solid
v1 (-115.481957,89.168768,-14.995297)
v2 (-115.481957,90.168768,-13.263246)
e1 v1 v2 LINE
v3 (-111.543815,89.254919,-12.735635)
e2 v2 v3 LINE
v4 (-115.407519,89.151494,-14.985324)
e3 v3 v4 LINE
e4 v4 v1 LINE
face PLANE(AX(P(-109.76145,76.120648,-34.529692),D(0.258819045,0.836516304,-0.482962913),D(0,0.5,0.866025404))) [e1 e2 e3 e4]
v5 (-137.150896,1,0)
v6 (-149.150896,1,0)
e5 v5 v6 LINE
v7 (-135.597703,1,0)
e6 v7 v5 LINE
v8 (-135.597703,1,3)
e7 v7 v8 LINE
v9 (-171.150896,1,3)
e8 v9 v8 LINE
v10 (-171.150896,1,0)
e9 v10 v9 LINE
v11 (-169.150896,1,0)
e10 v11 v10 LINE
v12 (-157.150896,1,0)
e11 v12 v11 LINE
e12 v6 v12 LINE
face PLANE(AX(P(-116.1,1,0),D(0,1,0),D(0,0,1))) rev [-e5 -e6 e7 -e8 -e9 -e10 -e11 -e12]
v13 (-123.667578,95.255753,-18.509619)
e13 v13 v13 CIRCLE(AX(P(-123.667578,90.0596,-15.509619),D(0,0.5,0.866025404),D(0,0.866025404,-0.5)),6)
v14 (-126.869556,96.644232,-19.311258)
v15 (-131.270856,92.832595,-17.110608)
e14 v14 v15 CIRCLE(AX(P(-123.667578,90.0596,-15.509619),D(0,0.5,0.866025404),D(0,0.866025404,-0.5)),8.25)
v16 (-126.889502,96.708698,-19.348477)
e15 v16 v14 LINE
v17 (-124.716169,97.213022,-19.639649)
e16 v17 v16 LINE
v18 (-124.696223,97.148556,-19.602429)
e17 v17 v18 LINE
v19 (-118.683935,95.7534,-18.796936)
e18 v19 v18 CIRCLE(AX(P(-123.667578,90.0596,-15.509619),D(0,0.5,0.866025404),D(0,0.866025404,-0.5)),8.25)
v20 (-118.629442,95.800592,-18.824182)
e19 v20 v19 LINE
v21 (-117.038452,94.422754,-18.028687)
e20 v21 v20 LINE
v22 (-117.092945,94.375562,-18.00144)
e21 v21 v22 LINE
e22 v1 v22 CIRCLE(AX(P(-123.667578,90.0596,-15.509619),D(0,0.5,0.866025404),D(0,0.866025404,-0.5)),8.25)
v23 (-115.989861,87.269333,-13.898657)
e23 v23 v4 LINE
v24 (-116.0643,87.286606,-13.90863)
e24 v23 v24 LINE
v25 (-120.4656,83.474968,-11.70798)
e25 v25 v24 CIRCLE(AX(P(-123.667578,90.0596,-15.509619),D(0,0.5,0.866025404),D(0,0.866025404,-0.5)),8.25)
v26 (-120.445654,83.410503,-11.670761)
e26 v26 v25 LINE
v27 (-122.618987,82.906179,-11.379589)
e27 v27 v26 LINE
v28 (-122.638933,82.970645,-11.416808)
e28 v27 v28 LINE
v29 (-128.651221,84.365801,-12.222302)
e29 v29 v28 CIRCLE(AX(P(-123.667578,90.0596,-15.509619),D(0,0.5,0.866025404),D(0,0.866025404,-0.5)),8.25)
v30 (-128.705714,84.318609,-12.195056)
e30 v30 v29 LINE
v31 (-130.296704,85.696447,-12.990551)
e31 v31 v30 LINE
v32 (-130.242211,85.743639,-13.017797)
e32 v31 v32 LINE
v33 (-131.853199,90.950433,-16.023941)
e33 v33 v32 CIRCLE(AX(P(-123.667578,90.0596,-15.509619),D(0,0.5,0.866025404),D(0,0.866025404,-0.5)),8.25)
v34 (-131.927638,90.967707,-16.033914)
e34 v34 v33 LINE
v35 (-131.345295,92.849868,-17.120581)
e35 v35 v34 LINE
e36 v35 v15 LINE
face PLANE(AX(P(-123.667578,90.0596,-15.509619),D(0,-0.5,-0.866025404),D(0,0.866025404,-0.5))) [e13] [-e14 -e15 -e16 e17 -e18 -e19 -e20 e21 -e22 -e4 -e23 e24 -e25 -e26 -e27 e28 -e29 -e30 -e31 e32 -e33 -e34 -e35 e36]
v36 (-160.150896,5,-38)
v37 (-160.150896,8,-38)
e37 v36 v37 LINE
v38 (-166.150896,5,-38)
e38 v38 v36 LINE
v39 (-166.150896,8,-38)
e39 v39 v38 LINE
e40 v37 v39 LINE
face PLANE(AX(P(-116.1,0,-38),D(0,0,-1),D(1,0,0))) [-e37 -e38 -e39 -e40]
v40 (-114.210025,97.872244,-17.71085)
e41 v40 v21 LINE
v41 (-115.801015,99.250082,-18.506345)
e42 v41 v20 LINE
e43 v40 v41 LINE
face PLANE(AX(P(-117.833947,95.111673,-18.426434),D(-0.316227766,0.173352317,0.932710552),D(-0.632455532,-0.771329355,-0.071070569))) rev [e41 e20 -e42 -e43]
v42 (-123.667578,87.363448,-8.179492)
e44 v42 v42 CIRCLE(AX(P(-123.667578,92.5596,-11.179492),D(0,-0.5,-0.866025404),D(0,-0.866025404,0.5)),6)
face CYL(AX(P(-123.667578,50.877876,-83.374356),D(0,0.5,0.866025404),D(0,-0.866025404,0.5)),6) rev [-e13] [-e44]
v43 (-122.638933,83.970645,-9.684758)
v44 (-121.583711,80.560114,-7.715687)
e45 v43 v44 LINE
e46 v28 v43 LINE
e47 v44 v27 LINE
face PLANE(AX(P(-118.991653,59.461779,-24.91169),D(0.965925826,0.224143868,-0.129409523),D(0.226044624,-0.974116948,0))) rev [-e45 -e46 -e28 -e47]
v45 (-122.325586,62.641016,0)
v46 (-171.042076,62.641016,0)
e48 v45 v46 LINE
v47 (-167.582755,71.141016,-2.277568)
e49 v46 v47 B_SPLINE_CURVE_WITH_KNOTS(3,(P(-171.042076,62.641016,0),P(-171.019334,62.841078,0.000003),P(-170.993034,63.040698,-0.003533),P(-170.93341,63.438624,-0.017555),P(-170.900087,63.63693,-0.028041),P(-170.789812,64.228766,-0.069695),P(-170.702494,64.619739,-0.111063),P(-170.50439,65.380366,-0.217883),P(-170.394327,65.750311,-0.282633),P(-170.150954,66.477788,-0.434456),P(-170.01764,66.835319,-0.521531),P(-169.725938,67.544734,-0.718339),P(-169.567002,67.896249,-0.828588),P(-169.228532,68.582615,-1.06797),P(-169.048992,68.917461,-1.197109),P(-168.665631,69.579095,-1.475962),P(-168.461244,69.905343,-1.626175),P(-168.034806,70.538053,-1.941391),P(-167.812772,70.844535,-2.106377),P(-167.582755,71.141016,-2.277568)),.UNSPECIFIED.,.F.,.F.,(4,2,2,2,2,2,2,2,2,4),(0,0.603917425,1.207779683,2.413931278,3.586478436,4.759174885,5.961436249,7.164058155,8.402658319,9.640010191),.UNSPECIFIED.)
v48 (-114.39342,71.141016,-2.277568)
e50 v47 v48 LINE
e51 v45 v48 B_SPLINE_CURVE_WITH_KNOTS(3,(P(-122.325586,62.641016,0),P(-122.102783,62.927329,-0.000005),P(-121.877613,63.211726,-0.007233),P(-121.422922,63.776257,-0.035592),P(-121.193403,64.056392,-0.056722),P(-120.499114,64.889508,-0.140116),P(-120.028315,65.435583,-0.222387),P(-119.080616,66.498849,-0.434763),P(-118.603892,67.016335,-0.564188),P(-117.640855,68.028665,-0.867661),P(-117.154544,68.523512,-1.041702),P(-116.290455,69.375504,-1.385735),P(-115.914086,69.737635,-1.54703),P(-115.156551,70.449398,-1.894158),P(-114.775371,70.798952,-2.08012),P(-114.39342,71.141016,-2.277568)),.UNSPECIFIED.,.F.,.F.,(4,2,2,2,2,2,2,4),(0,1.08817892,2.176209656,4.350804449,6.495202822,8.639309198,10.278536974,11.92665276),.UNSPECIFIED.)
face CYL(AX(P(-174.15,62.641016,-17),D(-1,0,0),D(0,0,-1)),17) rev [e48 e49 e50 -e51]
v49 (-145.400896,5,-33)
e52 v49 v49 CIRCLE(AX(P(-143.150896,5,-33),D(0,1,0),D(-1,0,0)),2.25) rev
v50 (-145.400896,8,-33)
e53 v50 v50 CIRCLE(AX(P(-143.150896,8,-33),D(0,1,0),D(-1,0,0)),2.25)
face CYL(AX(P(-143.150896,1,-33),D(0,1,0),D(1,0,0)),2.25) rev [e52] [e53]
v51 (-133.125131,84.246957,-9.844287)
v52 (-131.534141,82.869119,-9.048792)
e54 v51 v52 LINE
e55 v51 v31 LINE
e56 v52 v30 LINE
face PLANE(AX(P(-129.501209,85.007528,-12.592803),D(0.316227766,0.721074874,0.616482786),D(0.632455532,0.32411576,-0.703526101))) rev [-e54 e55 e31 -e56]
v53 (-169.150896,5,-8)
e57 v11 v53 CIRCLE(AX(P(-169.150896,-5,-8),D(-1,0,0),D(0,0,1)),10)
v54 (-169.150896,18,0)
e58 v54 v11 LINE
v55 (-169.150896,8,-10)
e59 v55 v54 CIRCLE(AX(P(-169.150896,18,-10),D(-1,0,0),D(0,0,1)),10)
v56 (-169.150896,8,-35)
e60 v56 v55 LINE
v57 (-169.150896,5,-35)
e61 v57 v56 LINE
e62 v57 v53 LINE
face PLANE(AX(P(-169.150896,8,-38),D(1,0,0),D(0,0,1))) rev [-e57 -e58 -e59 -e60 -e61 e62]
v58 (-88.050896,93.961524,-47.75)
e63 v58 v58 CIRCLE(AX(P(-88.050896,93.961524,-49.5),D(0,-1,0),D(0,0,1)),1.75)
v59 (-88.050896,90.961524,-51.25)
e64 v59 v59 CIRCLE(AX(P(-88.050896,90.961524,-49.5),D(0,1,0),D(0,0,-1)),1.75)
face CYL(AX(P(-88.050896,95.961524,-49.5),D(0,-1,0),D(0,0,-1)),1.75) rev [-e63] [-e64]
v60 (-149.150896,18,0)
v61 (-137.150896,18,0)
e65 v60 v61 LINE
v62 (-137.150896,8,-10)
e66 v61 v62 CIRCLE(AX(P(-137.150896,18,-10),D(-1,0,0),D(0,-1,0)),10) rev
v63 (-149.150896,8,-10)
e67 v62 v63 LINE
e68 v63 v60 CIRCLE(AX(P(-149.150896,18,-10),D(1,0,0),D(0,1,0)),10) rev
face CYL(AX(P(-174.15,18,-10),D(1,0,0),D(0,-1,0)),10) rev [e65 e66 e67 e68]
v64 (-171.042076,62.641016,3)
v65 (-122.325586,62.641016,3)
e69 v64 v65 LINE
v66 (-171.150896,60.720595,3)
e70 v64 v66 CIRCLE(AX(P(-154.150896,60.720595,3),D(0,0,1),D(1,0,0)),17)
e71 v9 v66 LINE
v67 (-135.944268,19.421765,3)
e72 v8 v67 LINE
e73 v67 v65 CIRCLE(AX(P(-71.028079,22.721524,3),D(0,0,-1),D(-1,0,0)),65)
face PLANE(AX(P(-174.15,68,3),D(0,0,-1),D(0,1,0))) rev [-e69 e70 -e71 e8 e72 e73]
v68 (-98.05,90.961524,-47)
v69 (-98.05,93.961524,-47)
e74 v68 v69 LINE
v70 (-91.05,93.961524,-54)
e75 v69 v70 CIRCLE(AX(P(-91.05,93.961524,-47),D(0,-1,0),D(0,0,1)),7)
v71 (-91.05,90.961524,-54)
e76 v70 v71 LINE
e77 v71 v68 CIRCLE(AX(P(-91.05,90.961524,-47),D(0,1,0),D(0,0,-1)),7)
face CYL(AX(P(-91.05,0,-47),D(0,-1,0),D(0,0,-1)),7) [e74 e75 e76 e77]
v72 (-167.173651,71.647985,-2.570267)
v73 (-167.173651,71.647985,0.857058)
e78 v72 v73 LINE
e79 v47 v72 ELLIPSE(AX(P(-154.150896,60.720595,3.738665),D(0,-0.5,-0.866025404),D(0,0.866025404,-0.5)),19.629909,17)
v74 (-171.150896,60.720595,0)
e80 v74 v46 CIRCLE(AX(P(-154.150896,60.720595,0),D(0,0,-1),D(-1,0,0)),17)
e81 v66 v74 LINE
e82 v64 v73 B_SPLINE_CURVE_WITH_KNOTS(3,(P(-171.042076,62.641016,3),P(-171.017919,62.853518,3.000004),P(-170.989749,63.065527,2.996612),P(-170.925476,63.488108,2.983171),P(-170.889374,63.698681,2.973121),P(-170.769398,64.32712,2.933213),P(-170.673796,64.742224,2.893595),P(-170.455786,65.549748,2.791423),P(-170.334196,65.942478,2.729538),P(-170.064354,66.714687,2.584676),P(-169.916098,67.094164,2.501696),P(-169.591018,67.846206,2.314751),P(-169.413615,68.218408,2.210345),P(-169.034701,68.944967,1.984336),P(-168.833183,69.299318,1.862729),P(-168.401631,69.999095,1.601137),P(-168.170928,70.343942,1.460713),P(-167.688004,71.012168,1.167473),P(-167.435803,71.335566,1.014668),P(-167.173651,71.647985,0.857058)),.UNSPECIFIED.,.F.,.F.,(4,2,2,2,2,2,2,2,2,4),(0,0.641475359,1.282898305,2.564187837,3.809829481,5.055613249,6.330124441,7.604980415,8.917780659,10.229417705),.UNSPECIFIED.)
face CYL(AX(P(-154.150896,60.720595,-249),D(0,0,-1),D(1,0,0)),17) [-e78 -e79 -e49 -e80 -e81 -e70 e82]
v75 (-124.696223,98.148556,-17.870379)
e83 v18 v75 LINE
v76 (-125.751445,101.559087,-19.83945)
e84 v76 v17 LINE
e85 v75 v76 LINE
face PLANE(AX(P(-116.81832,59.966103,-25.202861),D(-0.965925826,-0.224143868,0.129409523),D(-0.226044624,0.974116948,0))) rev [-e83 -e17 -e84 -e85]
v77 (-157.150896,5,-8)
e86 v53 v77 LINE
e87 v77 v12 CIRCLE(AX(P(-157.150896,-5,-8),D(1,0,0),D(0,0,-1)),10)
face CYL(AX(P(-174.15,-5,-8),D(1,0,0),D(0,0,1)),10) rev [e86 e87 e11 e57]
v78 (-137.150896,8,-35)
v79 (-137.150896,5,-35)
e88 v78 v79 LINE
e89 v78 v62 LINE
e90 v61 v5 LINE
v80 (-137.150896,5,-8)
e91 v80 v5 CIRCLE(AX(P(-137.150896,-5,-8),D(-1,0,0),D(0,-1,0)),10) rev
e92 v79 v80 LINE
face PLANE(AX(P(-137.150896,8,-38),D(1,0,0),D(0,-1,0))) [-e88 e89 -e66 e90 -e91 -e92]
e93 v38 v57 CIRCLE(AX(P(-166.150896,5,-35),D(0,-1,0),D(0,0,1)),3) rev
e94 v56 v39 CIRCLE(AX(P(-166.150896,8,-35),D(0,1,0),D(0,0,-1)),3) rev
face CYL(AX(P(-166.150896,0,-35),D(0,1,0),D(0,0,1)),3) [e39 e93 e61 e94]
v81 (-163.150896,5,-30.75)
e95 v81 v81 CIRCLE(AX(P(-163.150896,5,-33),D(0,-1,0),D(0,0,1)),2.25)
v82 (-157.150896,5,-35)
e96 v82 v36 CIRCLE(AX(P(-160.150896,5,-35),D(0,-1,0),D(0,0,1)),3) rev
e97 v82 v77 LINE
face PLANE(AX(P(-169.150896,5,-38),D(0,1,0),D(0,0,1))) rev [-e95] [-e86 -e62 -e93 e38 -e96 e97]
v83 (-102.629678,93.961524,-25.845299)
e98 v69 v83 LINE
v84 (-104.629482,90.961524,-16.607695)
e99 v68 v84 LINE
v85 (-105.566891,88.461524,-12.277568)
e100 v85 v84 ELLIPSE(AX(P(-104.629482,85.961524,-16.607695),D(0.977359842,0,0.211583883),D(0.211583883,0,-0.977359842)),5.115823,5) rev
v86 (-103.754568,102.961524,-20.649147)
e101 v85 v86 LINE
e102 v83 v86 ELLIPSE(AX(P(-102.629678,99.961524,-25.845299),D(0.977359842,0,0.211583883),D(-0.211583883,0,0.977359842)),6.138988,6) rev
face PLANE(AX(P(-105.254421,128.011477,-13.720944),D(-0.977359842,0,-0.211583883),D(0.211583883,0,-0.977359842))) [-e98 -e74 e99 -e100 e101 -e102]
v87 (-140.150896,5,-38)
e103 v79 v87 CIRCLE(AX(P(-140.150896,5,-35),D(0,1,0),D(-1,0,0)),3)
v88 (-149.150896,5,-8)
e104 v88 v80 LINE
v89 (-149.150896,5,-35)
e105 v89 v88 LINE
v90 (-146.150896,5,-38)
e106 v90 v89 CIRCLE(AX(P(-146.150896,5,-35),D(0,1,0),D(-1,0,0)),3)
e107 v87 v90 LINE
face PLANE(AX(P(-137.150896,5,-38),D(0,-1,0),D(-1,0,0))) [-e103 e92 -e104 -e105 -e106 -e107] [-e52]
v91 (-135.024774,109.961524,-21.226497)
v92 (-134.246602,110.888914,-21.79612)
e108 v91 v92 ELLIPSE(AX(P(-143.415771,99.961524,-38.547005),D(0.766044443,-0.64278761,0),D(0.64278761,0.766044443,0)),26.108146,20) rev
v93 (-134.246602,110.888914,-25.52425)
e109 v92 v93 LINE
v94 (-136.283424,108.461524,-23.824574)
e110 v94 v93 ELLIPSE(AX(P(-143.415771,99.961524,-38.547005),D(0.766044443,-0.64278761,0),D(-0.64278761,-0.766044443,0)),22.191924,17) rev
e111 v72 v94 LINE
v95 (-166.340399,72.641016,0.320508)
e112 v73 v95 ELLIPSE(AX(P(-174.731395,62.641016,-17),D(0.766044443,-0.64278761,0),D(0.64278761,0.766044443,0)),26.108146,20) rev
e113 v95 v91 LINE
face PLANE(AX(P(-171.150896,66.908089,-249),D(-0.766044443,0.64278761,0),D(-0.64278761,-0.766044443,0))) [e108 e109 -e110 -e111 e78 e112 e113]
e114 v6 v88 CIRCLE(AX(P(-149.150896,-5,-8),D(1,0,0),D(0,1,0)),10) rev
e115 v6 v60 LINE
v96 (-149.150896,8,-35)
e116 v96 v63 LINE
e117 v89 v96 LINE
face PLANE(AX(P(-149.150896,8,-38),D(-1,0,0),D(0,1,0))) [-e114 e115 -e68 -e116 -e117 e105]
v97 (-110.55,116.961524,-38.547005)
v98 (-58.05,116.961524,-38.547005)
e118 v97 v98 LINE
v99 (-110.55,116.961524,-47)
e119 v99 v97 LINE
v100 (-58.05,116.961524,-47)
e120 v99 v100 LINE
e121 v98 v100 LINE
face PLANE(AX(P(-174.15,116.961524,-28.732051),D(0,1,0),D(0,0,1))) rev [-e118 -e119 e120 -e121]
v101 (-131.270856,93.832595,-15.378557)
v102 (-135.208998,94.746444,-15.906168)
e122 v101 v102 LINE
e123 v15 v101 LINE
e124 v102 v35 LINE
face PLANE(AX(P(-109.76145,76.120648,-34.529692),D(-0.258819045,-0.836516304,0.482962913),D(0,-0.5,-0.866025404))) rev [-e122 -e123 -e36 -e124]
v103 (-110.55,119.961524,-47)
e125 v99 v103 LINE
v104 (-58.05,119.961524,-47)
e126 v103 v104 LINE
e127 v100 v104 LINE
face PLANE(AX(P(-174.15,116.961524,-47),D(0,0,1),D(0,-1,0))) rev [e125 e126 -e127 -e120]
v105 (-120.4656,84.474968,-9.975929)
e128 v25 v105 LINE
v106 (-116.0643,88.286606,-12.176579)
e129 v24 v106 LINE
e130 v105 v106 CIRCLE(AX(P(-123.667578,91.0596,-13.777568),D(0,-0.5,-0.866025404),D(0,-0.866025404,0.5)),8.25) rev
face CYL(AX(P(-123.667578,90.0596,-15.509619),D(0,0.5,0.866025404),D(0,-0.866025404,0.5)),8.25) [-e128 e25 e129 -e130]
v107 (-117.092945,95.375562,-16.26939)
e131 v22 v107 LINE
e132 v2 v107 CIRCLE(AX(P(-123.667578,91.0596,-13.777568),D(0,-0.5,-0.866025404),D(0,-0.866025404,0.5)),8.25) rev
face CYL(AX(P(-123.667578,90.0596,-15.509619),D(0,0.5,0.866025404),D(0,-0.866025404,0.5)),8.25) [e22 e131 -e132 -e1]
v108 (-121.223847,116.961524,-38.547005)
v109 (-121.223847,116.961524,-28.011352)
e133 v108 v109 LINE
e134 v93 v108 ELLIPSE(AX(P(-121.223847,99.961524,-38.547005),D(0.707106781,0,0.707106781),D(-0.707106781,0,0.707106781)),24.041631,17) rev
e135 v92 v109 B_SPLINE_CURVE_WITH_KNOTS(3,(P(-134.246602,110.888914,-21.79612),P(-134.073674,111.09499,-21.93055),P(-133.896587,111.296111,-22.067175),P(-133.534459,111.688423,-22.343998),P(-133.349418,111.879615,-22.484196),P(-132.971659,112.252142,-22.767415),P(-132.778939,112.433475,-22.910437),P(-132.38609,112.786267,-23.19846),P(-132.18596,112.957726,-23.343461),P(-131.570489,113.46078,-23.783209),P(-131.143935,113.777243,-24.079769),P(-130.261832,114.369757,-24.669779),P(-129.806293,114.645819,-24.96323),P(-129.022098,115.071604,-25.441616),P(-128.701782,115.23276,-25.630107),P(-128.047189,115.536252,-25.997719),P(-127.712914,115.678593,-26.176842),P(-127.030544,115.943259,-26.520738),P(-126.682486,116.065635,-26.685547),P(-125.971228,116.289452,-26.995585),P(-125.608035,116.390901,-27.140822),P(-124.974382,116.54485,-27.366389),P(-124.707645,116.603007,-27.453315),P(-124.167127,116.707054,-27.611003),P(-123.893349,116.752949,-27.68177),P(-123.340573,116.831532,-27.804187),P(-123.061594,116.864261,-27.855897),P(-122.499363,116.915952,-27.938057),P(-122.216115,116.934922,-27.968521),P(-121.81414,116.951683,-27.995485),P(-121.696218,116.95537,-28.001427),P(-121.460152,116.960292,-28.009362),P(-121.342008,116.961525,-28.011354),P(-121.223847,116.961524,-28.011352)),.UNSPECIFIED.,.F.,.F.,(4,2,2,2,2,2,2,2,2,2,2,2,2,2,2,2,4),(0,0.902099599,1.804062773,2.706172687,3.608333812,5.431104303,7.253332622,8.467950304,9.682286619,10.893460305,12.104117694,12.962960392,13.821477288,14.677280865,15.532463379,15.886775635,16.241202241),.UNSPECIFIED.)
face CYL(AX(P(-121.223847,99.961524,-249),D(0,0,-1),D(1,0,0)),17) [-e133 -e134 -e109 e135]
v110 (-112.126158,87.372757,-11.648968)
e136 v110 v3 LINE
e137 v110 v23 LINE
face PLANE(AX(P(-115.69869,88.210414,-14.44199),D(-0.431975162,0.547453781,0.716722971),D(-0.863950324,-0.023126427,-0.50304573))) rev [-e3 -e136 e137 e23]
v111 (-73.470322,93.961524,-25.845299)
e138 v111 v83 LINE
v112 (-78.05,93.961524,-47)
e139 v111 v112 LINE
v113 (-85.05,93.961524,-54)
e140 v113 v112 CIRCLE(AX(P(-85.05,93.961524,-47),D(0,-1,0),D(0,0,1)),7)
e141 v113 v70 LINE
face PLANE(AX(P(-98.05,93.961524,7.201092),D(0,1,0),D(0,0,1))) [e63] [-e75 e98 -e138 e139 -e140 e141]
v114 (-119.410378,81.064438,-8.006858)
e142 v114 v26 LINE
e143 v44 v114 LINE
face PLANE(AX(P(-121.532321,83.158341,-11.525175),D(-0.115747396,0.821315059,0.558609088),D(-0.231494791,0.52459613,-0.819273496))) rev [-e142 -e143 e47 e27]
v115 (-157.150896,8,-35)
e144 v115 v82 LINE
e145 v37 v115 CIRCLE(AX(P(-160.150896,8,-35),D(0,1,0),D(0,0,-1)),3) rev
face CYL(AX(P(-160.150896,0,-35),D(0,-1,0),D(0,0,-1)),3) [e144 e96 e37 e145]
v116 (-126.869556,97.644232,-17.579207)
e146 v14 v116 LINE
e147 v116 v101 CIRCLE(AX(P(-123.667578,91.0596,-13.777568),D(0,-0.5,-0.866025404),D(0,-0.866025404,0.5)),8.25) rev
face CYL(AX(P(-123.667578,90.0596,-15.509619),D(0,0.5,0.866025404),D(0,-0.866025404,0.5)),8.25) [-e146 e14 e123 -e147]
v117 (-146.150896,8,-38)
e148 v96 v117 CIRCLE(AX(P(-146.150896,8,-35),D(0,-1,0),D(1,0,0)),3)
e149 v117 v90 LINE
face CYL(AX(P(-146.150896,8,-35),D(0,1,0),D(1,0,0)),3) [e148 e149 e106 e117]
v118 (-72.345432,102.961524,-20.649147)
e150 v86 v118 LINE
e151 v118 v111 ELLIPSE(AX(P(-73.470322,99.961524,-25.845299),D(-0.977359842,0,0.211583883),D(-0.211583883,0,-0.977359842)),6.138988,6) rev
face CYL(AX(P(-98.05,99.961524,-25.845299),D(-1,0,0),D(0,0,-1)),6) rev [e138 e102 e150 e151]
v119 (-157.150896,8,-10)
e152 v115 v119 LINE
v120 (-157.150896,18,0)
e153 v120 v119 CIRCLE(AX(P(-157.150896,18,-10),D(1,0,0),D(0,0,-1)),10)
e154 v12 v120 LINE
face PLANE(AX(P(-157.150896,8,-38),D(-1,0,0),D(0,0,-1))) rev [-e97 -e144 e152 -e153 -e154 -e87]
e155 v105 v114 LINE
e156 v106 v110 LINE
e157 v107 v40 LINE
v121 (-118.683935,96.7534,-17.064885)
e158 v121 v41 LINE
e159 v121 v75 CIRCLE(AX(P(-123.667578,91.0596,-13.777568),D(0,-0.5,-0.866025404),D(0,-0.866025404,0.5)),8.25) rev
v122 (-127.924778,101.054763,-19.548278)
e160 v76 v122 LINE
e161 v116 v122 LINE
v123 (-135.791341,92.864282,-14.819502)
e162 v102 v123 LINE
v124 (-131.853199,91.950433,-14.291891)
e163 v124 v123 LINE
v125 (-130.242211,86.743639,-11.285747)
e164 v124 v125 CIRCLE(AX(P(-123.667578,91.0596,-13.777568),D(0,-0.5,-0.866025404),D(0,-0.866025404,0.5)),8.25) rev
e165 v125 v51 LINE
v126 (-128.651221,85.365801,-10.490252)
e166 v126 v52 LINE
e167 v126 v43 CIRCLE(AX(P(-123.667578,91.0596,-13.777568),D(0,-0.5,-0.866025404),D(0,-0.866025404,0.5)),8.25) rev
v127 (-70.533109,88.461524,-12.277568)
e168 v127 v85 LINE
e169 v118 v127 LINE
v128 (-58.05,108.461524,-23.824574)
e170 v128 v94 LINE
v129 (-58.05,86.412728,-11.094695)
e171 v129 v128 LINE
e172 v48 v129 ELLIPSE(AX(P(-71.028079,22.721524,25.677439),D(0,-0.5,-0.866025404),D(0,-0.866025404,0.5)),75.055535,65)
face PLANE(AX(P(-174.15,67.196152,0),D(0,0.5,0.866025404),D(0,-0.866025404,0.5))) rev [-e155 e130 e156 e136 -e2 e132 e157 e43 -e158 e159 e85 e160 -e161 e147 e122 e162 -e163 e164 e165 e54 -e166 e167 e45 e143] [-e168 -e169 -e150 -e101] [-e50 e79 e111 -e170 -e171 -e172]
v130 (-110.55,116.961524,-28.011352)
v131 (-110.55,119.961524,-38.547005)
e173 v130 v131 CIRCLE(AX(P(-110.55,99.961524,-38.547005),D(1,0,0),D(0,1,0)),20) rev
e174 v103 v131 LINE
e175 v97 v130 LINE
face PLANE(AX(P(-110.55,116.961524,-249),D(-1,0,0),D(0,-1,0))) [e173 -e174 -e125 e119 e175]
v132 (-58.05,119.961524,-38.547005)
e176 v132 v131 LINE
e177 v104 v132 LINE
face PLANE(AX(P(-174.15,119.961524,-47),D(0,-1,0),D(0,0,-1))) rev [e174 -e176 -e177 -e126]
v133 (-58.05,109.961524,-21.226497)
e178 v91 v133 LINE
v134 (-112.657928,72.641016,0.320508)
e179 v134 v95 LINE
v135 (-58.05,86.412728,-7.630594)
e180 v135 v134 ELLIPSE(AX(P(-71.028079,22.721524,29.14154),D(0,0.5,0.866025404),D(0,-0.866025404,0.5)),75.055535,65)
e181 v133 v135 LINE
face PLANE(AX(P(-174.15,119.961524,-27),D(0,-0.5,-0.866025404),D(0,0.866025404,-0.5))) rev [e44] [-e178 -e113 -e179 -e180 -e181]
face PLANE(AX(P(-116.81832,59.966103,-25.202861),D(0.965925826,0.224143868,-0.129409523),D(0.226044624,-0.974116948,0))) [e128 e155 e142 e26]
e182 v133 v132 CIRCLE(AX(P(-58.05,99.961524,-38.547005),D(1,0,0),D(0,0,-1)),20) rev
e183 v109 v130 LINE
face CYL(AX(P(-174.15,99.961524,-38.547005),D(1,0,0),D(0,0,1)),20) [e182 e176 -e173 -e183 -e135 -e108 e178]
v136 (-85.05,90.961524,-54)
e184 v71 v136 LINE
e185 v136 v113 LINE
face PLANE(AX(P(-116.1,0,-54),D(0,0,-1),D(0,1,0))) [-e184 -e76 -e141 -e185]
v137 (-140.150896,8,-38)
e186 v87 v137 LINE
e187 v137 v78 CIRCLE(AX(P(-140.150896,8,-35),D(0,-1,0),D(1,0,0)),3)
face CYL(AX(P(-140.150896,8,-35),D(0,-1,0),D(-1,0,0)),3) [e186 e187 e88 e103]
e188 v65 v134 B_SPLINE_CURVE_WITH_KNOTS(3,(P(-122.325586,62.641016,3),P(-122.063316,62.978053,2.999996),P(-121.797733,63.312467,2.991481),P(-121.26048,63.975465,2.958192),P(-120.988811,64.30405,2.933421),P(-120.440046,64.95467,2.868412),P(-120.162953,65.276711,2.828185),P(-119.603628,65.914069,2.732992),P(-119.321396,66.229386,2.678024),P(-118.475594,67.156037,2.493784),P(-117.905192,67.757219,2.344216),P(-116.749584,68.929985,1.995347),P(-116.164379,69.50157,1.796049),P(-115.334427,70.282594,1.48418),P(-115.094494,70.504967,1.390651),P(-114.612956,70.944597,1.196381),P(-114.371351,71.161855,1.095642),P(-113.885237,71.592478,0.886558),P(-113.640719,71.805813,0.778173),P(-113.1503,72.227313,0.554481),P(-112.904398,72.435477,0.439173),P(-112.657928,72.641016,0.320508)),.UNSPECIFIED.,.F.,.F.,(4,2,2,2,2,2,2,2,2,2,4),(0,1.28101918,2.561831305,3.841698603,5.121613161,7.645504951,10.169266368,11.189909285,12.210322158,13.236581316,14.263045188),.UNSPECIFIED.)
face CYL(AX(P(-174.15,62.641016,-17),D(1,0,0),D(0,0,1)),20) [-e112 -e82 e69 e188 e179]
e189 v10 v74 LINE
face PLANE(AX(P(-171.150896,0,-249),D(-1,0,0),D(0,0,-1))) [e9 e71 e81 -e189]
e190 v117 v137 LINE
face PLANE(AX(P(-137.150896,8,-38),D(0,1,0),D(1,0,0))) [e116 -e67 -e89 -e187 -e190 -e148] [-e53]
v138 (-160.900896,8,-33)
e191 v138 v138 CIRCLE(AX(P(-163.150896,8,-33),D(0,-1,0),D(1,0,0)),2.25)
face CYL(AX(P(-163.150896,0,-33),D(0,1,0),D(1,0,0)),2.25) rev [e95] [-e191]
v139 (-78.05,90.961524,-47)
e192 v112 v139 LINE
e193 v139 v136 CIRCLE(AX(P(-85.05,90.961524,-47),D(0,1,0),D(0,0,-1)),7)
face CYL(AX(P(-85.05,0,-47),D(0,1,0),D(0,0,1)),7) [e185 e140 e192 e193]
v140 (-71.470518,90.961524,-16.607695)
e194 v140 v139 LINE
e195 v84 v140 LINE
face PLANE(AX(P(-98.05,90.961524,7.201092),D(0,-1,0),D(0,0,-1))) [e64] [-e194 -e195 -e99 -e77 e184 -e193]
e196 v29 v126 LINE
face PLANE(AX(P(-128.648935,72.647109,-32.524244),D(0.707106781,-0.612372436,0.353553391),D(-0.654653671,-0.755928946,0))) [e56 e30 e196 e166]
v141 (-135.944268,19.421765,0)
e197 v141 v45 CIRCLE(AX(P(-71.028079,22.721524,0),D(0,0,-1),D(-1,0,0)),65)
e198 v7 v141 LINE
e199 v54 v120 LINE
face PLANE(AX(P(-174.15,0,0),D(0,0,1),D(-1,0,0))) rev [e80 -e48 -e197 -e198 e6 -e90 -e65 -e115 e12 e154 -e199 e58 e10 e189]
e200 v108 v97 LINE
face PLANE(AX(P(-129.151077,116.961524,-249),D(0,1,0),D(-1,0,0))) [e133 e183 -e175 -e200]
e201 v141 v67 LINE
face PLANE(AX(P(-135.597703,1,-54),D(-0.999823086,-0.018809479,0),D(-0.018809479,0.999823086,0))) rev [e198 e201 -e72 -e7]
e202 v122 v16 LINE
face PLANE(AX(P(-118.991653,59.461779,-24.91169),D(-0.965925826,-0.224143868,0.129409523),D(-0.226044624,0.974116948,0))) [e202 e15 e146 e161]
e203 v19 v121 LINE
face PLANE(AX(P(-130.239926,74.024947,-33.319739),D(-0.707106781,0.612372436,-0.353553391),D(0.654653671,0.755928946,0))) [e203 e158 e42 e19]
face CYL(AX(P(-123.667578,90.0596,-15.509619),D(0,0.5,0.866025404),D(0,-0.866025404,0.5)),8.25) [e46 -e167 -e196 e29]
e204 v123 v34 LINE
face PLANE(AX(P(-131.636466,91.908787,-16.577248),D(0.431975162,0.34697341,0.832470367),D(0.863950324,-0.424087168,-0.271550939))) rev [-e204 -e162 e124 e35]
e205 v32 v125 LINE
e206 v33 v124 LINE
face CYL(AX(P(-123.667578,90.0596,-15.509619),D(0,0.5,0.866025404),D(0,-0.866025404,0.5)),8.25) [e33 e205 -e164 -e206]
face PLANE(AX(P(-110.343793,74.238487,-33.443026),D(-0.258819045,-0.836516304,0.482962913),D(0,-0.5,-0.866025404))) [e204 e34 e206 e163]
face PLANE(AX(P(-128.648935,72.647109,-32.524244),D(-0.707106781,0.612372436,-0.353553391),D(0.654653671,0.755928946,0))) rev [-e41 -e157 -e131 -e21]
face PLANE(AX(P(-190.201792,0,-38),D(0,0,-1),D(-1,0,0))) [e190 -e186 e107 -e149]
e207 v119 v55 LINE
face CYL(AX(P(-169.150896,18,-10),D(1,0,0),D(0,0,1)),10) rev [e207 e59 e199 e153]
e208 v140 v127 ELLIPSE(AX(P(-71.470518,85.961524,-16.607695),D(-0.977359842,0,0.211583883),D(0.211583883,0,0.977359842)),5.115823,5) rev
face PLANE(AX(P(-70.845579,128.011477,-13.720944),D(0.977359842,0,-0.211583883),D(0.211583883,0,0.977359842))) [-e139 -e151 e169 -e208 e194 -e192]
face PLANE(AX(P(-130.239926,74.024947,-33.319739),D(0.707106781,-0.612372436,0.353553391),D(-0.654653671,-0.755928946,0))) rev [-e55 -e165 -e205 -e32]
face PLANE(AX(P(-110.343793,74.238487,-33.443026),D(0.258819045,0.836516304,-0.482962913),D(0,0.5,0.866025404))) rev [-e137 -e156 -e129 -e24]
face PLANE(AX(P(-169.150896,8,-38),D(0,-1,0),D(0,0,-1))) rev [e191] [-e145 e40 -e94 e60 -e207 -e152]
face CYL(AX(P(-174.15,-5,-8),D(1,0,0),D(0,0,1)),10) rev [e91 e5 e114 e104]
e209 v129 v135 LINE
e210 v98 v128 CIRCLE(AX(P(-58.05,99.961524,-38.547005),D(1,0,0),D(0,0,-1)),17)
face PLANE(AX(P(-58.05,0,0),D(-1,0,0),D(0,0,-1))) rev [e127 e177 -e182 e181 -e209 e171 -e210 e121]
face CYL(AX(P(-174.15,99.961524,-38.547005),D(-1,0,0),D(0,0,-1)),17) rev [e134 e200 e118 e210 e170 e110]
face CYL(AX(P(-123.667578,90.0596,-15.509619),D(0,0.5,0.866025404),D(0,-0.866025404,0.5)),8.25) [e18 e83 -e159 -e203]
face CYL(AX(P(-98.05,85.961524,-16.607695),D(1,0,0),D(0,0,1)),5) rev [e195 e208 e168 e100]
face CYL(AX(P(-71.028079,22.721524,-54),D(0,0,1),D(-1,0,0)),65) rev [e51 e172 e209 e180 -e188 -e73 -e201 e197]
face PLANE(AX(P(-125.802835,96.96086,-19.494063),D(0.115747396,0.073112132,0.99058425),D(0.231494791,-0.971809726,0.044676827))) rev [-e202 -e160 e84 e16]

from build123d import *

# Parameters (mm, degrees)
SALIENTE_EXTRUIR1_DEPTH  = 58.05
REDONDEO1_R              = 20
REDONDEO2_R              = 20
REDONDEO3_R              = 17
REDONDEO4_R              = 17
CAVIDAD1_START           = -47
CAVIDAD1_DEPTH           = 51
CROQUIS8_W               = 12
CROQUIS8_H               = 3
SALIENTE_EXTRUIR2_DEPTH  = 38
CROQUIS9_R               = 2.25
CORTAR_EXTRUIR6_DEPTH    = 135.588949923
SALIENTE_EXTRUIR3_REACH  = 146.947
CROQUIS11_W              = 20
CROQUIS11_H              = 3
CROQUIS12_W              = 69.238292886
CROQUIS12_H              = 3
CORTAR_EXTRUIR7_DEPTH    = 1
CROQUIS15_R              = 1.75
CORTAR_EXTRUIR10_DEPTH   = 5
REDONDEO5_R              = 7
REDONDEO6_R              = 3
CROQUIS18_R              = 6
CORTAR_EXTRUIR12_DEPTH   = 146.081609054
CROQUIS19_R              = 8.25
CROQUIS19_R_2            = 6
SALIENTE_EXTRUIR4_DEPTH  = 2
CROQUIS16_R              = 65
CORTAR_EXTRUIR11_DEPTH   = 145.946782753
SALIENTE_EXTRUIR5_DEPTH  = 3
NERVIO8_START            = -1.125
NERVIO8_DEPTH            = 2.25
MATRIZC2_COUNT           = 6
REDONDEO6_OF_SIMETR_A1_R = 3
REDONDEO7_R              = 10
REDONDEO8_R              = 10
REDONDEO9_R              = 6
CORTAR_EXTRUIR14_DEPTH   = 145.946782753
REDONDEO10_R             = 5


with BuildPart() as part:
    # Croquis1 → Saliente-Extruir1 (new, symmetric)
    with BuildSketch(Plane(origin=(0, 0, 0), x_dir=(0, 0, -1), z_dir=(1, 0, 0))):
        Polygon((0, 0), (0, 67.196152423), (28.732050808, 116.961524227), (47, 116.961524227), (47, 119.961524227), (27, 119.961524227), (-3, 68), (-3, 0), align=None)
    extrude(amount=SALIENTE_EXTRUIR1_DEPTH, both=True)

    # Redondeo1
    redondeo1_edges = [part.edges().sort_by_distance(p)[0] for p in [
        (0, 68, 3),
    ]]
    fillet(redondeo1_edges, radius=REDONDEO1_R)

    # Redondeo2
    redondeo2_edges = [part.edges().sort_by_distance(p)[0] for p in [
        (0, 119.961524227, -27),
    ]]
    fillet(redondeo2_edges, radius=REDONDEO2_R)

    # Redondeo3
    redondeo3_edges = [part.edges().sort_by_distance(p)[0] for p in [
        (0, 116.961524227, -28.732050808),
    ]]
    fillet(redondeo3_edges, radius=REDONDEO3_R)

    # Redondeo4
    redondeo4_edges = [part.edges().sort_by_distance(p)[0] for p in [
        (0, 67.196152423, 0),
    ]]
    fillet(redondeo4_edges, radius=REDONDEO4_R)

    # Cavidad1: read off the stored shape, not the designer's step
    # Cavidad1 outline → Cavidad1 (cut)
    with BuildSketch(Plane.XY.offset(CAVIDAD1_START)):
        with BuildLine():
            Line((58.05, 0), (58.05, 119.961524227))
            Line((58.05, 119.961524227), (-5.55, 119.961524227))
            Line((-5.55, 119.961524227), (-5.55, 116.961524227))
            Line((-5.55, 116.961524227), (5.123846837, 116.961524227))
            ThreePointArc((5.123846837, 116.961524227), (12.308357287, 115.368756607), (18.14660237, 110.888913592))
            Line((18.14660237, 110.888913592), (51.073651347, 71.647984679))
            ThreePointArc((51.073651347, 71.647984679), (54.025670368, 66.534937751), (55.050895814, 60.720595315))
            Line((55.050895814, 60.720595315), (55.050895814, 0))
            Line((55.050895814, 0), (58.05, 0))
        make_face()
    extrude(amount=CAVIDAD1_DEPTH, mode=Mode.SUBTRACT)

    # Croquis8 → Saliente-Extruir2 (add)
    with BuildSketch(Plane(origin=(0, 0, 0), x_dir=(-1, 0, 0), z_dir=(0, 0, -1))):
        with Locations((-47.050895814, 6.5)):
            Rectangle(CROQUIS8_W, CROQUIS8_H)
    saliente_extruir2 = extrude(amount=SALIENTE_EXTRUIR2_DEPTH)

    # Croquis9 → Cortar-Extruir6 (cut, through all)
    with BuildSketch(Plane(origin=(0, 8, 0), x_dir=(1, 0, 0), z_dir=(0, 1, 0))):
        with Locations(Location((47.050895814, 33, 0), (0, 0, 180))):
            Circle(CROQUIS9_R)
    cortar_extruir6 = extrude(amount=-CORTAR_EXTRUIR6_DEPTH, mode=Mode.SUBTRACT)

    # Saliente-Extruir3: up to this plane
    saliente_extruir3_end = Plane(origin=(58.05, 67.196152423, 0), z_dir=(0, 0.49999999999999767, 0.86602540378444))
    # Croquis11 → Saliente-Extruir3 (add, up to the surface)
    with BuildSketch(Plane(origin=(0, 0, -54), x_dir=(-1, 0, 0), z_dir=(0, 0, -1)), mode=Mode.PRIVATE) as saliente_extruir3_sk1:
        with Locations((28.05, 92.461524227)):
            Rectangle(CROQUIS11_W, CROQUIS11_H)
    saliente_extruir3_tool1 = split(extrude(saliente_extruir3_sk1.sketch, amount=-SALIENTE_EXTRUIR3_REACH, mode=Mode.PRIVATE), bisect_by=saliente_extruir3_end, keep=Keep.BOTH, mode=Mode.PRIVATE)
    add(saliente_extruir3_tool1.solids().sort_by_distance((-28.05, 92.461524, -54))[0])

    # Croquis12 → Cortar-Extruir7 (cut)
    with BuildSketch(Plane.XZ):
        with Locations((20.431749371, 1.5)):
            Rectangle(CROQUIS12_W, CROQUIS12_H)
    extrude(amount=-CORTAR_EXTRUIR7_DEPTH, mode=Mode.SUBTRACT)

    # Croquis15 → Cortar-Extruir10 (cut)
    with BuildSketch(Plane.XZ.offset(-90.961524227)):
        with Locations(Location((-28.049104186, -49.5, 0), (0, 0, 270))):
            Circle(CROQUIS15_R)
    extrude(amount=-CORTAR_EXTRUIR10_DEPTH, mode=Mode.SUBTRACT)

    # Redondeo5
    redondeo5_edges = [part.edges().sort_by_distance(p)[0] for p in [
        (-18.05, 92.461524227, -54),
        (-38.05, 92.461524227, -54),
    ]]
    fillet(redondeo5_edges, radius=REDONDEO5_R)

    # Redondeo6
    redondeo6_edges = [part.edges().sort_by_distance(p)[0] for p in [
        (53.050895814, 6.5, -38),
        (41.050895814, 6.5, -38),
    ]]
    fillet(redondeo6_edges, radius=REDONDEO6_R)

    # Croquis18 → Cortar-Extruir12 (cut, through all)
    with BuildSketch(Plane(origin=(0, 18.299038106, 31.694863729), x_dir=(1, 0, 0), z_dir=(0, 0.4999999999999976, 0.86602540378444))):
        with Locations(Location((7.567578046, 85.748711306, 0), (0, 0, 270))):
            Circle(CROQUIS18_R)
    extrude(amount=-CORTAR_EXTRUIR12_DEPTH, mode=Mode.SUBTRACT)

    # Croquis19 → Saliente-Extruir4 (add)
    with BuildSketch(Plane(origin=(0, 16.799038106, 29.096787517), x_dir=(-1, 0, 0), z_dir=(0, -0.4999999999999977, -0.8660254037844399))):
        with Locations(Location((-7.567578046, 85.748711306, 0), (0, 0, 270))):
            Circle(CROQUIS19_R)
        with Locations(Location((-7.567578046, 85.748711306, 0), (0, 0, 270))):
            Circle(CROQUIS19_R_2, mode=Mode.SUBTRACT)
    extrude(amount=SALIENTE_EXTRUIR4_DEPTH)

    # Croquis16 → Cortar-Extruir11 (cut, through all)
    with BuildSketch(Plane.XY.offset(3)):
        with Locations((-45.071920691, 22.721524227)):
            Circle(CROQUIS16_R)
    extrude(amount=-CORTAR_EXTRUIR11_DEPTH, mode=Mode.SUBTRACT)

    # Croquis25 → Saliente-Extruir5 (add)
    with BuildSketch(Plane.XZ.offset(-90.961524227)):
        Polygon((-38.05, -13.720943809), (-45.254421175, -13.720943809), (-38.05, -47), align=None)
        Polygon((-10.845578825, -13.720943809), (-18.05, -47), (-18.05, -13.720943809), align=None)
    extrude(amount=-SALIENTE_EXTRUIR5_DEPTH)

    # Nervio8: read off the stored shape, not the designer's step
    # Nervio8 outline → Nervio8 (add)
    with BuildSketch(Plane(origin=(46.658144676, 40.407138583, -23.329072338), x_dir=(-0.7071067811865435, 0.6123724356957997, -0.353553390593273), z_dir=(-0.7071067811865517, -0.612372435695792, 0.35355339059327007)).offset(NERVIO8_START)):
        Polygon((47.10947397, -31.598076211), (47.032409489, -31.598076211), (43.032409489, -33.598076211), (47.10947397, -33.598076211), align=None)
    nervio8 = extrude(amount=NERVIO8_DEPTH)

    # MatrizC2: Nervio8 ×6 about axis
    matrizc2_axis = Axis((7.567578046, 74.260562333, -42.874355653), (0, -0.49999999999999767, -0.86602540378444))
    for i in range(1, MATRIZC2_COUNT):
        add(nervio8.rotate(matrizc2_axis, i * 360 / MATRIZC2_COUNT))

    # Simetría1: Saliente-Extruir2, Cortar-Extruir6 across plane
    add(saliente_extruir2.mirror(Plane(origin=(37.050895814, 0, 0), x_dir=(0, 0, 1), z_dir=(1, 0, 0))))
    add(cortar_extruir6.mirror(Plane(origin=(37.050895814, 0, 0), x_dir=(0, 0, 1), z_dir=(1, 0, 0))), mode=Mode.SUBTRACT)

    # Redondeo6 of Simetría1
    redondeo6_of_simetr_a1_edges = [part.edges().sort_by_distance(p)[0] for p in [
        (21.050895814, 6.5, -38),
        (33.050895814, 6.5, -38),
    ]]
    fillet(redondeo6_of_simetr_a1_edges, radius=REDONDEO6_OF_SIMETR_A1_R)

    # Redondeo7
    # the kernel refuses this fillet: 10 mm, written as the material it adds along each edge
    with BuildSketch(Plane(origin=(21.050895814, 5, 0), x_dir=(0, -1, 0), z_dir=(1, 0, 0))) as redondeo7_piece_1_section:
        with BuildLine():
            CenterArc((10, 8), REDONDEO7_R, 180, 53.130102354)
            Line((0, 8), (-0.2, 8))
            Line((-0.2, 8), (-0.2, 0))
            Line((-0.2, 0), (0, -0.2))
            ThreePointArc((0, -0.2), (2, -0.2), (3.88, -0.16))
            Line((3.88, -0.16), (4, 0))
        make_face()
    redondeo7_piece_1 = extrude(amount=32, mode=Mode.PRIVATE)
    redondeo7_piece_1 = split(redondeo7_piece_1, bisect_by=Plane(origin=(33.050895814, 5, 0), z_dir=(-1, 0, 0)), keep=Keep.TOP, mode=Mode.PRIVATE)
    add(redondeo7_piece_1)
    with BuildSketch(Plane(origin=(41.050895814, 5, 0), x_dir=(0, -1, 0), z_dir=(1, 0, 0))) as redondeo7_piece_2:
        with BuildLine():
            CenterArc((10, 8), REDONDEO7_R, 180, 53.130102354)
            Line((0, 8), (-0.2, 8))
            Line((-0.2, 8), (-0.2, 0))
            Line((-0.2, 0), (0, -0.2))
            ThreePointArc((0, -0.2), (2, -0.2), (3.88, -0.16))
            Line((3.88, -0.16), (4, 0))
        make_face()
    extrude(amount=12)
    with BuildSketch(Plane(origin=(53.050895814, 5, 0), x_dir=(0, -1, 0), z_dir=(-1, 0, 0))) as redondeo7_piece_3_section:
        with BuildLine():
            CenterArc((10, -8), REDONDEO7_R, 126.869897646, 53.130102354)
            Line((0, -8), (-0.2, -8))
            Line((-0.2, -8), (-0.2, 0))
            Line((-0.2, 0), (0, 0.2))
            ThreePointArc((0, 0.2), (2, 0.2), (3.88, 0.16))
            Line((3.88, 0.16), (4, 0))
        make_face()
    redondeo7_piece_3 = extrude(amount=32, mode=Mode.PRIVATE)
    redondeo7_piece_3 = split(redondeo7_piece_3, bisect_by=Plane(origin=(41.050895814, 5, 0), z_dir=(1, 0, 0)), keep=Keep.TOP, mode=Mode.PRIVATE)
    add(redondeo7_piece_3)
    with BuildSketch(Plane(origin=(33.050895814, 5, 0), x_dir=(0, -1, 0), z_dir=(-1, 0, 0))) as redondeo7_piece_4:
        with BuildLine():
            CenterArc((10, -8), REDONDEO7_R, 126.869897646, 53.130102354)
            Line((0, -8), (-0.2, -8))
            Line((-0.2, -8), (-0.2, 0))
            Line((-0.2, 0), (0, 0.2))
            ThreePointArc((0, 0.2), (2, 0.2), (3.88, 0.16))
            Line((3.88, 0.16), (4, 0))
        make_face()
    extrude(amount=12)

    # Redondeo8
    redondeo8_edges = [part.edges().sort_by_distance(p)[0] for p in [
        (47.050895814, 8, 0),
        (27.050895814, 8, 0),
    ]]
    fillet(redondeo8_edges, radius=REDONDEO8_R)

    # Redondeo9
    redondeo9_edges = [part.edges().sort_by_distance(p)[0] for p in [
        (-28.05, 93.961524227, -15.452994616),
    ]]
    fillet(redondeo9_edges, radius=REDONDEO9_R)

    # Croquis31 → Cortar-Extruir14 (cut, through all)
    with BuildSketch(Plane.XY.offset(3)):
        with BuildLine():
            Line((16.191244305, 1), (19.497703143, 1))
            Line((19.497703143, 1), (19.844268253, 19.421764692))
            ThreePointArc((19.844268253, 19.421764692), (18.686590065, 10.078253042), (16.191244305, 1))
        make_face()
    extrude(amount=-CORTAR_EXTRUIR14_DEPTH, mode=Mode.SUBTRACT)

    # Redondeo10
    redondeo10_edges = [part.edges().sort_by_distance(p)[0] for p in [
        (-28.05, 90.961524227, -13.720943809),
    ]]
    fillet(redondeo10_edges, radius=REDONDEO10_R)


with BuildPart() as body_2:
    # Simetría2: mirrored copy
    add(part.part.mirror(Plane(origin=(-58.05, 0, 0), x_dir=(0, 0, 1), z_dir=(1, 0, 0))))


solid = body_2.part
